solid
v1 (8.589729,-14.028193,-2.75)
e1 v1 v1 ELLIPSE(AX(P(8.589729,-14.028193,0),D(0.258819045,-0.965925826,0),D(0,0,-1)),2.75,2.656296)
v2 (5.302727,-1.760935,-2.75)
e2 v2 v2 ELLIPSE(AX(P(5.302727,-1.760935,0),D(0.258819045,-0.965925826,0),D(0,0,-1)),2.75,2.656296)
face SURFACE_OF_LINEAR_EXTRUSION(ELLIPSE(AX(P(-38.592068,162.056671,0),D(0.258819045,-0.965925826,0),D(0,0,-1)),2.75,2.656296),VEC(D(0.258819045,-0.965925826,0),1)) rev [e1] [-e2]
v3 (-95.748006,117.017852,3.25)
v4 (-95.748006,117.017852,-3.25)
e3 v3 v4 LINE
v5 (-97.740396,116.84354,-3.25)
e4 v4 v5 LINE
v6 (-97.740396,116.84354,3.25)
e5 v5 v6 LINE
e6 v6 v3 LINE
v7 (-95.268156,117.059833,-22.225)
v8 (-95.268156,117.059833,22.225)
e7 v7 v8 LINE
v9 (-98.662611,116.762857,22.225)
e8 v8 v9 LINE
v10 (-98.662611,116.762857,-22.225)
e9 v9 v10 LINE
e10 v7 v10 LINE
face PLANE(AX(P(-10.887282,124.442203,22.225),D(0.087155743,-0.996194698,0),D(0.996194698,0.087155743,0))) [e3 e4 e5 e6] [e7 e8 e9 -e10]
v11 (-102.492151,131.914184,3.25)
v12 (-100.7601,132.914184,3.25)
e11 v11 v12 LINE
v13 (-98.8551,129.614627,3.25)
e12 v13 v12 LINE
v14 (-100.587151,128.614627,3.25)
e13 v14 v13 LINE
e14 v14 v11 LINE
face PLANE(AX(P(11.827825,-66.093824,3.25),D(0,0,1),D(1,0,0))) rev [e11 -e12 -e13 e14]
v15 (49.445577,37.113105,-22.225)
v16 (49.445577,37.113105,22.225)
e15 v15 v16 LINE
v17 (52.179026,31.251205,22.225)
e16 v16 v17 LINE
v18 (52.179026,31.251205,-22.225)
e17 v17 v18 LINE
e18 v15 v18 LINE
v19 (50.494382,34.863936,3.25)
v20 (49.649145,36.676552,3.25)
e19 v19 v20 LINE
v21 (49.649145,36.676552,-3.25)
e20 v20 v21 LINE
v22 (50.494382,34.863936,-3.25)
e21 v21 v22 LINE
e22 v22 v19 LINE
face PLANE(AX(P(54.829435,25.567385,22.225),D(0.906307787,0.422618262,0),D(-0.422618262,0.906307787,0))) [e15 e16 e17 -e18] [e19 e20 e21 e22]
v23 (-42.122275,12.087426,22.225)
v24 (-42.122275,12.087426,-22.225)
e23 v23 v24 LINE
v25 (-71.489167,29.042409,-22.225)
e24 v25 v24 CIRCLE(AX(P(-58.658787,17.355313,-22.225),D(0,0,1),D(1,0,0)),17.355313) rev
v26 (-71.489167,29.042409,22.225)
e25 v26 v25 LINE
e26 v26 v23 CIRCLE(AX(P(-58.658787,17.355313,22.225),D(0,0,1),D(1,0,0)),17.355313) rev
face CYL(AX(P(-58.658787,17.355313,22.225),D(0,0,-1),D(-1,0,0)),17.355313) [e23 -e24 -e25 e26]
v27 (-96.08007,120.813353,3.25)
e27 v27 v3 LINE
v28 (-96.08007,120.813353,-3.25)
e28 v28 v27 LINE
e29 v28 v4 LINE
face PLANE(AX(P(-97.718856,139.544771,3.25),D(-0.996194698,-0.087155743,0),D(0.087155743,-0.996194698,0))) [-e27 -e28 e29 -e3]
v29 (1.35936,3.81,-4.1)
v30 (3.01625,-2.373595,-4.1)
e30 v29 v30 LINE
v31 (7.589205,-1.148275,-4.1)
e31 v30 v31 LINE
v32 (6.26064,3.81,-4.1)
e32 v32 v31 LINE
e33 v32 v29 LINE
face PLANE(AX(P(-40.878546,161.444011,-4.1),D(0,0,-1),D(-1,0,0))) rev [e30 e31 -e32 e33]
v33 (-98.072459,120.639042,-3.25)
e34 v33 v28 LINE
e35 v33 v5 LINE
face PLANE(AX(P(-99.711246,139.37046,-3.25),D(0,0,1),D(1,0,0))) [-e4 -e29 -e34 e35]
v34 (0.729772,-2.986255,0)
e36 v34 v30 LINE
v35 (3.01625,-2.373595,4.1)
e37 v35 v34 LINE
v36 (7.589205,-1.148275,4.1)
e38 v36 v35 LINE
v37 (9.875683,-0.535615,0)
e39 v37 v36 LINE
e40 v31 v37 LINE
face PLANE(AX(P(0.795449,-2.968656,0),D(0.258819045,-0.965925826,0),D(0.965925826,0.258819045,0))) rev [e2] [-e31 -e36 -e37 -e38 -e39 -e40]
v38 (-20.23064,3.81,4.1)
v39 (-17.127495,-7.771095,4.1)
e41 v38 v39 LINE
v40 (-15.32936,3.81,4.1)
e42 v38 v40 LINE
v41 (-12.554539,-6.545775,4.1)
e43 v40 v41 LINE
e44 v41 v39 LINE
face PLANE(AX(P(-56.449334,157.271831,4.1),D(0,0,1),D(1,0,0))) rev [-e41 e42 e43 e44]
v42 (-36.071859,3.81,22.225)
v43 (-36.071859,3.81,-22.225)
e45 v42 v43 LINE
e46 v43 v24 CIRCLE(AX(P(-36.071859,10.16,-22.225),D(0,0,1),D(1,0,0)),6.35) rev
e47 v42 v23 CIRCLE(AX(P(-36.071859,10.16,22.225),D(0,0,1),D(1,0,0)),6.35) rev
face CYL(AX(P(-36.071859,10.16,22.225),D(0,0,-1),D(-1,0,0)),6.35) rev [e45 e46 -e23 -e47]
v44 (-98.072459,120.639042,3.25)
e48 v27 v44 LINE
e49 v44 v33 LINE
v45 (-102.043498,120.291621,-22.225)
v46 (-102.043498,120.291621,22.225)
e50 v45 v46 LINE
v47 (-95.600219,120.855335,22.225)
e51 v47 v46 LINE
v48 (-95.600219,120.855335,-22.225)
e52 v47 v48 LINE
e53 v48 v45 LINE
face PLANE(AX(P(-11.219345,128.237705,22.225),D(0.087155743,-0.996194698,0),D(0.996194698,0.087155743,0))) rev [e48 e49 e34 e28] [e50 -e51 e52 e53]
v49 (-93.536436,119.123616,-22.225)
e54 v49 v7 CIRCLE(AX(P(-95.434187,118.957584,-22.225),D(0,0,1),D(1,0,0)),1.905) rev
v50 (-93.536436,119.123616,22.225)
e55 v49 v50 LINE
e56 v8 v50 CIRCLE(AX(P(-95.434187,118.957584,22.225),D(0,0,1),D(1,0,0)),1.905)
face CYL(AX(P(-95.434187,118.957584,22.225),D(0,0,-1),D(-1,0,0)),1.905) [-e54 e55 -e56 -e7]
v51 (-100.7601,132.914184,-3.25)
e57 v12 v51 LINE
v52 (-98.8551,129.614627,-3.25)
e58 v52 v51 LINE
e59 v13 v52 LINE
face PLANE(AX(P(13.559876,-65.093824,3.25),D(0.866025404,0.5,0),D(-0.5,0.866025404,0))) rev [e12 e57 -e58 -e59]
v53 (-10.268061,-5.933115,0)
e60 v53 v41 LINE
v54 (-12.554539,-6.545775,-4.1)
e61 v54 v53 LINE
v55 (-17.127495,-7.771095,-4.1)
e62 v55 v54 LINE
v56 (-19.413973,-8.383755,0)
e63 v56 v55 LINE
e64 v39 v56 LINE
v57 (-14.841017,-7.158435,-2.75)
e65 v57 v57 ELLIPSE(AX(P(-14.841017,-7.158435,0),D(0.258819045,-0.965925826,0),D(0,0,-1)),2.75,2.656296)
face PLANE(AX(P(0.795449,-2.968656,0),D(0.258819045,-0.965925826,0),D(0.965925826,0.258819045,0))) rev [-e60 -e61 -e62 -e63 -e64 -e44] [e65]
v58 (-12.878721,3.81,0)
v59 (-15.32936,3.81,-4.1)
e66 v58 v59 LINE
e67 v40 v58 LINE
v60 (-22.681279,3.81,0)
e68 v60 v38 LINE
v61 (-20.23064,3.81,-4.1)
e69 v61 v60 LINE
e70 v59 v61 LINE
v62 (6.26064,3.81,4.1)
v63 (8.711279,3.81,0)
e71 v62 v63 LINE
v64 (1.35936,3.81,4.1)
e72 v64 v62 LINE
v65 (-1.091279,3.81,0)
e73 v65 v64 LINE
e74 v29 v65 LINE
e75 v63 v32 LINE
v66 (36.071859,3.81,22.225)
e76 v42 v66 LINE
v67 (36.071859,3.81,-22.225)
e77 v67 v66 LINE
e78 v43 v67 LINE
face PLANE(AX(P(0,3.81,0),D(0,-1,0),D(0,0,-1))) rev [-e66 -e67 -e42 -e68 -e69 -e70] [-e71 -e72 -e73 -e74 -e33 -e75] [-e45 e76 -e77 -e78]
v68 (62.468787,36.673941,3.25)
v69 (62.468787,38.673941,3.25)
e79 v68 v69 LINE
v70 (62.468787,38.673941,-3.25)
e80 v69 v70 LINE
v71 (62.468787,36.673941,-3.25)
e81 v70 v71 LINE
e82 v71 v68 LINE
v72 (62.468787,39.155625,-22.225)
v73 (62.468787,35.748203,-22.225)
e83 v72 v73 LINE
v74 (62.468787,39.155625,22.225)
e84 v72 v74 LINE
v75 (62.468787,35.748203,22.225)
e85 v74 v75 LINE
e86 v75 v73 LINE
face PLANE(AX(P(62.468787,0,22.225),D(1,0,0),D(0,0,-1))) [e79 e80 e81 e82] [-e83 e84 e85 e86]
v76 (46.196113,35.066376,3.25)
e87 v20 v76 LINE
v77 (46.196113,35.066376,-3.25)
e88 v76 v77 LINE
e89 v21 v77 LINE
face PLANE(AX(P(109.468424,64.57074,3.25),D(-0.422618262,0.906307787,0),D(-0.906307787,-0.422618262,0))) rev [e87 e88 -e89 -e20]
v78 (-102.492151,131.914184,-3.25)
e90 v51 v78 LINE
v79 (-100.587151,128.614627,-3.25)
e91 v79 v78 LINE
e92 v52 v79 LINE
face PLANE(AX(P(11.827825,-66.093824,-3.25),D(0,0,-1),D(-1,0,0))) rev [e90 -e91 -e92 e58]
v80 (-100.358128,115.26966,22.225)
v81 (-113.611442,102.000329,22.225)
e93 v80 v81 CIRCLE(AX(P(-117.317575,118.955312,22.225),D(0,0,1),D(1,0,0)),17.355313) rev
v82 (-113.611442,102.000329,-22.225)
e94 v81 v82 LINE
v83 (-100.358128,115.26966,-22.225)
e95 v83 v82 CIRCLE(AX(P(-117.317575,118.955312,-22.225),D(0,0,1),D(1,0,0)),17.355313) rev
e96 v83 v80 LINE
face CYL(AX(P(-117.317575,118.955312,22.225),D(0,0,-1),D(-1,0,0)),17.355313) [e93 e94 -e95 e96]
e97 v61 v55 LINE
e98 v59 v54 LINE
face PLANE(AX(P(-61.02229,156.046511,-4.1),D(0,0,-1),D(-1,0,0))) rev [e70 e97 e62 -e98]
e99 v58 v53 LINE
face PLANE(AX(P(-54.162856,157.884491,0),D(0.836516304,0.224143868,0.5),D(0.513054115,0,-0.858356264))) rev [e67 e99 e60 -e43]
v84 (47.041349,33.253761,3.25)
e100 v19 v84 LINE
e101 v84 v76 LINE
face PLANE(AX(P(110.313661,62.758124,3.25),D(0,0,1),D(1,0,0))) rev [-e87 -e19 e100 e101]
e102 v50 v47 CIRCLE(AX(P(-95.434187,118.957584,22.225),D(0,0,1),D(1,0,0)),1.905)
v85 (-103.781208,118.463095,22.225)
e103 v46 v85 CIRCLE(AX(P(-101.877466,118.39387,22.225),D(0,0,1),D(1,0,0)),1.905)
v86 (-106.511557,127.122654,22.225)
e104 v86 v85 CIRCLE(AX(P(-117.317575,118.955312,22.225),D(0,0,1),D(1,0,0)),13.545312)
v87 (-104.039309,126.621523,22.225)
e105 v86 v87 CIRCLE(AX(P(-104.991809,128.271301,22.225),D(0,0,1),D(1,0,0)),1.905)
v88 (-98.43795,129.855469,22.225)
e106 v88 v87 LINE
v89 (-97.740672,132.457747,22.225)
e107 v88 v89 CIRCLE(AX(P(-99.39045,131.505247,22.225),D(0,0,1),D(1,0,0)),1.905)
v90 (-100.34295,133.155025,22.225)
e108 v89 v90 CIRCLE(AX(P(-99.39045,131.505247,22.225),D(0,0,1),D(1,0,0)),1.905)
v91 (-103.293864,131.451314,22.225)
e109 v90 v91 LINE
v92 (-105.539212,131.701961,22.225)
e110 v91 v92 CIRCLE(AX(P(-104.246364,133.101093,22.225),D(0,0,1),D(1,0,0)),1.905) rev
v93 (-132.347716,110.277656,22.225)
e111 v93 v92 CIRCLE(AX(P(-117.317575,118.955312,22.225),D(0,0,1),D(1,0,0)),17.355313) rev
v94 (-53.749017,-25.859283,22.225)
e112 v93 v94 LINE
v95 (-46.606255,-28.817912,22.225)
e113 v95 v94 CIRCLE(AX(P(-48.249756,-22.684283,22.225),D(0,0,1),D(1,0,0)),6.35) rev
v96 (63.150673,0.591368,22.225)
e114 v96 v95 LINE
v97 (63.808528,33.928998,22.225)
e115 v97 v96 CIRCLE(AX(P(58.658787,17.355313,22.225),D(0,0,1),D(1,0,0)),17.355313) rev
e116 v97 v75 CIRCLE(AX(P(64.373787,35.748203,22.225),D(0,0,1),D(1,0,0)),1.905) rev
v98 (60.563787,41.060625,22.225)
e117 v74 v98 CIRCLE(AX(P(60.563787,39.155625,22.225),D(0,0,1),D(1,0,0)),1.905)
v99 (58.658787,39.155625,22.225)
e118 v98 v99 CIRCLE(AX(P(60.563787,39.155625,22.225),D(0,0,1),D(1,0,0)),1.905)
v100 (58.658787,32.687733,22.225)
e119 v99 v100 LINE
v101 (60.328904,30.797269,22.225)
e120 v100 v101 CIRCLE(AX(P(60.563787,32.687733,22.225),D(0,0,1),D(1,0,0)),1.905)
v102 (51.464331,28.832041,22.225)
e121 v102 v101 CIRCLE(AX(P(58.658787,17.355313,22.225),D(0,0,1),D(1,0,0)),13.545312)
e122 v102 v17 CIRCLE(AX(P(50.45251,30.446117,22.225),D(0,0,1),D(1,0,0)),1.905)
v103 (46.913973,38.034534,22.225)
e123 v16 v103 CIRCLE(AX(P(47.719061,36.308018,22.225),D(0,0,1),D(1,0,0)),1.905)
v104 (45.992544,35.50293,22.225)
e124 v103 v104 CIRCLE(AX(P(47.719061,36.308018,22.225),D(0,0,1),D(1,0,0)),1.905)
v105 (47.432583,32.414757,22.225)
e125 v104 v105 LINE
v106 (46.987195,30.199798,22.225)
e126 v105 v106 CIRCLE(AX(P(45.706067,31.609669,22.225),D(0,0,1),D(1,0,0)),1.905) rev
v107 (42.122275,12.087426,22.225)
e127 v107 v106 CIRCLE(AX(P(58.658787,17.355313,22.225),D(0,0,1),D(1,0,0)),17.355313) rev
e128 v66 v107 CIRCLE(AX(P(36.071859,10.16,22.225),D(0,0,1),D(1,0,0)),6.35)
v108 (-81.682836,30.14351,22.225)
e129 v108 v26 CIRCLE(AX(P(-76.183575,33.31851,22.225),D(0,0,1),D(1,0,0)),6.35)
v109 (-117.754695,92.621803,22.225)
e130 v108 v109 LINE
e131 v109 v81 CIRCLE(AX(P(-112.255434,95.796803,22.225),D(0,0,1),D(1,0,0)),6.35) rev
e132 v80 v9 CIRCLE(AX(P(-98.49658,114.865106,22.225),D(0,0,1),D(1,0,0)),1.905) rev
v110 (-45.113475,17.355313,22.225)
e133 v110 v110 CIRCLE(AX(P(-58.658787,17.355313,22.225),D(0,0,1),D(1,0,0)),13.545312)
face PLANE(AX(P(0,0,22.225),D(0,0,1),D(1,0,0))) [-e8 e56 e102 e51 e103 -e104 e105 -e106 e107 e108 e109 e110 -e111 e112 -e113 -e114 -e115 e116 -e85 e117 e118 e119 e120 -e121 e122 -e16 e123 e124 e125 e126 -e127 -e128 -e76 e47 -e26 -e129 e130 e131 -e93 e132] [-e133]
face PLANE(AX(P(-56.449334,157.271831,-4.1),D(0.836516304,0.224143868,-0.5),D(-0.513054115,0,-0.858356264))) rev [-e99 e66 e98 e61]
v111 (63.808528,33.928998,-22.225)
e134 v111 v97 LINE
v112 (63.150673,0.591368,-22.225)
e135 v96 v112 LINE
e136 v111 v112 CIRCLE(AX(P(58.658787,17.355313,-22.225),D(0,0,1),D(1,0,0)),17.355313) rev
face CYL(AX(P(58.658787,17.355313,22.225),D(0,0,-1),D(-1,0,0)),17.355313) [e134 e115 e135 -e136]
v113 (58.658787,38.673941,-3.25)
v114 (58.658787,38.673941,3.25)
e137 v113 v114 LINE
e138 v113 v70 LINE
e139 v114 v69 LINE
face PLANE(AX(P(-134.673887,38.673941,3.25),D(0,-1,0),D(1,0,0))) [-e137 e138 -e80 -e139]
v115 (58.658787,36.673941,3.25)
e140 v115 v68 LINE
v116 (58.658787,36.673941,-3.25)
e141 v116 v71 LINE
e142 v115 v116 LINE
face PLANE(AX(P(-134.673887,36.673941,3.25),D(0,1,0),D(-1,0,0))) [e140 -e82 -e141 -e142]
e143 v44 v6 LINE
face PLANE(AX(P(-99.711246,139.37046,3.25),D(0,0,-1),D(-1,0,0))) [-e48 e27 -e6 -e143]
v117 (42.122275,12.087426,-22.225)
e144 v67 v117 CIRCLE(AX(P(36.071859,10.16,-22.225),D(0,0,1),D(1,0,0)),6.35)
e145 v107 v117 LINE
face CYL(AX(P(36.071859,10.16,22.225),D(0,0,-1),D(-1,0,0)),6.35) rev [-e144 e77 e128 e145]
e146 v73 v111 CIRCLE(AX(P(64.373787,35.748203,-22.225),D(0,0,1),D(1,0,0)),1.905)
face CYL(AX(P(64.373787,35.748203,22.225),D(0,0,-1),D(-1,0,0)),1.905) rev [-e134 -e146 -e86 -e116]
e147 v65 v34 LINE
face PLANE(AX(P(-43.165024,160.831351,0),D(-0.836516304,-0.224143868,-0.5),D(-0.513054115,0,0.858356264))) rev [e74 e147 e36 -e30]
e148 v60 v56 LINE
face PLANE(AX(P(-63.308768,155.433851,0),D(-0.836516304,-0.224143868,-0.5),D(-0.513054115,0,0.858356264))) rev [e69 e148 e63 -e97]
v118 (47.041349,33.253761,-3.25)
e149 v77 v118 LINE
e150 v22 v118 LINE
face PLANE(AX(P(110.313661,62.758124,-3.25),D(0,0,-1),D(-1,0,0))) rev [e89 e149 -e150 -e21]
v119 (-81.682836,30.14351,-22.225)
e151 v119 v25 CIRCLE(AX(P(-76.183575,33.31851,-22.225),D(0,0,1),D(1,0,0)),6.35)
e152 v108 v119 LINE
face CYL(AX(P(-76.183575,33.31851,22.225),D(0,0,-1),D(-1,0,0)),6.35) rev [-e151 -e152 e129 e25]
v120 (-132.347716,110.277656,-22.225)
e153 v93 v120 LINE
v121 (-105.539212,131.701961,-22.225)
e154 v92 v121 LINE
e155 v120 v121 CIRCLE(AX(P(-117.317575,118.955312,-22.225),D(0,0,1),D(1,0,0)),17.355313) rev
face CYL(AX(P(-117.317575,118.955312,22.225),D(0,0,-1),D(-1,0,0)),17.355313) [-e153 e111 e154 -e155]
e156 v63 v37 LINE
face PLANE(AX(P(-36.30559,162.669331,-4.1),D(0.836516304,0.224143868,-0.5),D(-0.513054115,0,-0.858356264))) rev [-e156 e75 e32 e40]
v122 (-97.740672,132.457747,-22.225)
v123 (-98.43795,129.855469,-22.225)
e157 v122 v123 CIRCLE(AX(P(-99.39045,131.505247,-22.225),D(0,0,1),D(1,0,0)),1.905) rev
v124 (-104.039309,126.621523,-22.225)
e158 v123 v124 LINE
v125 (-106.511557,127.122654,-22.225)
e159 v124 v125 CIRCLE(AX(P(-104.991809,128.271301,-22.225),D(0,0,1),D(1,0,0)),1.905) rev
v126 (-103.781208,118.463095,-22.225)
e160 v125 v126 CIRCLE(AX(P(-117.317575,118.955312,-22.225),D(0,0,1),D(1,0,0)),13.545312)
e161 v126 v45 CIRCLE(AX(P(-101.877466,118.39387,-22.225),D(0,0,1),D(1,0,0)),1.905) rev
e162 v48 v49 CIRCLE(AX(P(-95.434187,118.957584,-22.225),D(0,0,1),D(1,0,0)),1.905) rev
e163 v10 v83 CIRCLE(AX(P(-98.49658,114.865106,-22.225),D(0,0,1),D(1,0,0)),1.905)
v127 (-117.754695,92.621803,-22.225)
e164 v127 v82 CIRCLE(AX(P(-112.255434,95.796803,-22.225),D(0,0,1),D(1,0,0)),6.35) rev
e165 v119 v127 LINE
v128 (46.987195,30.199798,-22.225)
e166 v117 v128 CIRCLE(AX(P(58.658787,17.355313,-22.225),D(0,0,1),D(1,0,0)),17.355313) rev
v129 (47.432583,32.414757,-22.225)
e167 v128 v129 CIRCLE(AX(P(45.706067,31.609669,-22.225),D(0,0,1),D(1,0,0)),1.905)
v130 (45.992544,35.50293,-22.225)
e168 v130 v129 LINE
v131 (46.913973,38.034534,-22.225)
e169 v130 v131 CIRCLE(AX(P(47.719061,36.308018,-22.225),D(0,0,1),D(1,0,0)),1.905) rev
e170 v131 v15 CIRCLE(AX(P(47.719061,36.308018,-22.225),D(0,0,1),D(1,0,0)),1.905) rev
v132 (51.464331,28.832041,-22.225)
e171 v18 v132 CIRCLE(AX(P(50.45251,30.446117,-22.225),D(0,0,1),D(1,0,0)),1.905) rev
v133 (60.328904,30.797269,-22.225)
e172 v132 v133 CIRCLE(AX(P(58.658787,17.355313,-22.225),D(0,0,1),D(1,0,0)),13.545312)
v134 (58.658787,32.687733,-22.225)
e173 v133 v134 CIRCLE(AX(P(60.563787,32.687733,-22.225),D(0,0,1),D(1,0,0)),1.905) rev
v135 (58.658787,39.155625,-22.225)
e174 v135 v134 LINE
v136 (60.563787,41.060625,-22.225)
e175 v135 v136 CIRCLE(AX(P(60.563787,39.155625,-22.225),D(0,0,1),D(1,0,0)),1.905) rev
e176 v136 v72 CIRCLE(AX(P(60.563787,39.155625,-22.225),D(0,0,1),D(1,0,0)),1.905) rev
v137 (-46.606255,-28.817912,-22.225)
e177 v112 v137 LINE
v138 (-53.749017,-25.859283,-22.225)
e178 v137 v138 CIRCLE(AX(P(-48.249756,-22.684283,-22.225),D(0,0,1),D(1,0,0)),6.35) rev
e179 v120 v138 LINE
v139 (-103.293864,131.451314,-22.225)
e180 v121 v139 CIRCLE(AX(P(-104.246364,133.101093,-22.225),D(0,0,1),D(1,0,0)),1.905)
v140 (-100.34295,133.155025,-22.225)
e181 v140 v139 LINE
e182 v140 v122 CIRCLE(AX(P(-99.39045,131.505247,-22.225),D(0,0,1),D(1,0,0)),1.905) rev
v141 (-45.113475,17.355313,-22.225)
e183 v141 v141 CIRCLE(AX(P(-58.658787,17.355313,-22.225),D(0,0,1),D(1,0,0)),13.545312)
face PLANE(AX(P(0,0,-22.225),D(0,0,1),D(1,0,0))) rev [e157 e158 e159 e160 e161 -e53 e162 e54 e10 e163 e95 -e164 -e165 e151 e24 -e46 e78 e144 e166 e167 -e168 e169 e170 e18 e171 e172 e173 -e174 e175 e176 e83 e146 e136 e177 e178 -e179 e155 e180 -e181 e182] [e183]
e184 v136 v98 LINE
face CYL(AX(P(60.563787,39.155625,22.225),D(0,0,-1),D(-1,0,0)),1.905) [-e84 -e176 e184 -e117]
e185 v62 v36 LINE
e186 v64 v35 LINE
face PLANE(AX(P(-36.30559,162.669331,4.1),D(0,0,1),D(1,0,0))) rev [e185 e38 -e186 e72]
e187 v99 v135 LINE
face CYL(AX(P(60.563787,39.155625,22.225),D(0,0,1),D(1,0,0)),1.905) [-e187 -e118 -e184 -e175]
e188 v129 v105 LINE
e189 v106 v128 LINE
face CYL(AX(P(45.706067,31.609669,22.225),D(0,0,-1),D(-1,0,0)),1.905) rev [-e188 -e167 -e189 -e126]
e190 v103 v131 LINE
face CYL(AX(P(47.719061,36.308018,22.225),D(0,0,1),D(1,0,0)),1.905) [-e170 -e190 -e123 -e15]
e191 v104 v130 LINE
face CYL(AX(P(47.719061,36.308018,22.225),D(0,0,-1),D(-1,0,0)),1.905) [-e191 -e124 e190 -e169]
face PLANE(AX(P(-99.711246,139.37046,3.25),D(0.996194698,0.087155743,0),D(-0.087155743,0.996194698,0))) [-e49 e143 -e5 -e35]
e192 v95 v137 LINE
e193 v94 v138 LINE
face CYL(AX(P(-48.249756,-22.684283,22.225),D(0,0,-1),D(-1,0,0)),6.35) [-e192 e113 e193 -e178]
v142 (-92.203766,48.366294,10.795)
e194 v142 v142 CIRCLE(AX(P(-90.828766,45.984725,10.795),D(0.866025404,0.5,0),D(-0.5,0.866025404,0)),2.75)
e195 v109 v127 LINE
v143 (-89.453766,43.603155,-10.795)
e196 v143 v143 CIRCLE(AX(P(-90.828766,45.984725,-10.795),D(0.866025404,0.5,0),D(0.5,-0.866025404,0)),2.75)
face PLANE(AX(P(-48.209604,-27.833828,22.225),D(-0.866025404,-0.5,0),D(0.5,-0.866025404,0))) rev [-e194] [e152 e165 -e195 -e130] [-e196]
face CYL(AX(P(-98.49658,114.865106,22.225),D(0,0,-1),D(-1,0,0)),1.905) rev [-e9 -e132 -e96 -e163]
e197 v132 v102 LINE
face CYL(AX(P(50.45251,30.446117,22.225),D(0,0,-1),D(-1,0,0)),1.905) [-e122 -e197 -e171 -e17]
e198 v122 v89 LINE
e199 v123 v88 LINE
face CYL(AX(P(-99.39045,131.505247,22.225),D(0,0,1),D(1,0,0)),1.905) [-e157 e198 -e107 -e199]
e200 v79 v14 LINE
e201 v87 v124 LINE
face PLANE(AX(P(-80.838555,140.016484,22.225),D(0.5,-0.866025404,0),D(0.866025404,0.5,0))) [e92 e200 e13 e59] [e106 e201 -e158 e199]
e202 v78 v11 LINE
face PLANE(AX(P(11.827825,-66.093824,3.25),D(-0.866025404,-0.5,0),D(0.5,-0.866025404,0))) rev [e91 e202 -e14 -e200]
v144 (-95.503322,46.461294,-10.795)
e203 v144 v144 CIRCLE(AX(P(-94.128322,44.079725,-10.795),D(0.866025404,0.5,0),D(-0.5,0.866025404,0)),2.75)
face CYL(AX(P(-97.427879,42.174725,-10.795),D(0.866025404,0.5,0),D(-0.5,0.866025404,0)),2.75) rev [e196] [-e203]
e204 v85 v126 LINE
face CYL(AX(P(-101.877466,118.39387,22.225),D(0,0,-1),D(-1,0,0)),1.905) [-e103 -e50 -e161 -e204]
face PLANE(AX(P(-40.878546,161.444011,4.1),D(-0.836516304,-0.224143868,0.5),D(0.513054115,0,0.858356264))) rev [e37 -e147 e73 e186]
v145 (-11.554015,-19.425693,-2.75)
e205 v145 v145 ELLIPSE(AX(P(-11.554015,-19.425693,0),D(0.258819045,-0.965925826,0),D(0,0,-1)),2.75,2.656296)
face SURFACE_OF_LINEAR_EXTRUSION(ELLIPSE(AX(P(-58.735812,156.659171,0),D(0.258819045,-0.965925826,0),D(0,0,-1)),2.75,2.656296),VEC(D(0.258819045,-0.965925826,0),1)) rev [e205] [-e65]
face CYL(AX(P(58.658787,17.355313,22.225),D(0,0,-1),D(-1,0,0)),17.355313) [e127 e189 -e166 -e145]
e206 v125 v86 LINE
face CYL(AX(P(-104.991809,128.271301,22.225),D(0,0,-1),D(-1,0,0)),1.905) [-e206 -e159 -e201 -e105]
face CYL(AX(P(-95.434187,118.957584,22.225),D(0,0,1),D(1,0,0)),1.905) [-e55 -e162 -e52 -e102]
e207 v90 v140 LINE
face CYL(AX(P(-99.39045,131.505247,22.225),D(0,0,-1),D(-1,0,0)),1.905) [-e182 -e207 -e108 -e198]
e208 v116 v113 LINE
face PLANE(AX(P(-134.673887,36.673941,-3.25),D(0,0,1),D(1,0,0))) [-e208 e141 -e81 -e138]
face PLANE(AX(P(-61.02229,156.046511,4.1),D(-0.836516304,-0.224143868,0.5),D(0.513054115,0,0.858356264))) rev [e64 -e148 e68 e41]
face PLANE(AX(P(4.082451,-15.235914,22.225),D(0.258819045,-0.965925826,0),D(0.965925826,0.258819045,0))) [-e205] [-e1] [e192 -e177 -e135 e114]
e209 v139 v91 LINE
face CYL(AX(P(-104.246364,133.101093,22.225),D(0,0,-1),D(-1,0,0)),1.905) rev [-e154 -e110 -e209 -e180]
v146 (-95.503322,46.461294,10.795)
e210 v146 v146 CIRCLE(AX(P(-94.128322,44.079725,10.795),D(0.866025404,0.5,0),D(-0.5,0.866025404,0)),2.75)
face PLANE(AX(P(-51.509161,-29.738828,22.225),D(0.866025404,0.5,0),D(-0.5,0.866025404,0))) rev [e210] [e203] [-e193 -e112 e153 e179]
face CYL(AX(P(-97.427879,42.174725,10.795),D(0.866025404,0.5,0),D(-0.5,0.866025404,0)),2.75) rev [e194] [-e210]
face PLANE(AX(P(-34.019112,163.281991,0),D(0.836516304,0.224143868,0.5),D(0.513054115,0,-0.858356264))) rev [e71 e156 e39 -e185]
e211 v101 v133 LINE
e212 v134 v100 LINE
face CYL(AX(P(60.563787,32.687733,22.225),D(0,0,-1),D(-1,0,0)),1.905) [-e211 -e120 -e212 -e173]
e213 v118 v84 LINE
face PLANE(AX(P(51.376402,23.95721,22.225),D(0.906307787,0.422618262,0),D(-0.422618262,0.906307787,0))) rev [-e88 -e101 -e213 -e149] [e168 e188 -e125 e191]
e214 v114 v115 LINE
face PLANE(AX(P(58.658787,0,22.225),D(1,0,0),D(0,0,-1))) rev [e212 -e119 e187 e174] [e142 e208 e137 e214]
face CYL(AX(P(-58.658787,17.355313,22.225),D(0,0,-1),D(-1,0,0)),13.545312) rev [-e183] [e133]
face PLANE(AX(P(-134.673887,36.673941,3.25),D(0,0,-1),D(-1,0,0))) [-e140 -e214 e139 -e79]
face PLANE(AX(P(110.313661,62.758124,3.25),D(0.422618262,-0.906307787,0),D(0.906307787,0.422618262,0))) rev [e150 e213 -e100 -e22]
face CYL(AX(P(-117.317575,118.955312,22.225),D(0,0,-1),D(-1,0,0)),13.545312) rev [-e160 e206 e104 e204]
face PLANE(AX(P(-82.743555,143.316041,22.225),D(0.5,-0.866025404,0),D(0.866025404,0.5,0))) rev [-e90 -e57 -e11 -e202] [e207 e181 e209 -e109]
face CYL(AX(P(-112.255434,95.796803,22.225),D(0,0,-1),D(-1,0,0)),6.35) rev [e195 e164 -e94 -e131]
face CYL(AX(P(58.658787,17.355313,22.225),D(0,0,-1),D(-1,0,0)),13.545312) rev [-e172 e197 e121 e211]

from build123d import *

# Parameters (mm, degrees)
SKETCH3_W               = 114.3
SKETCH3_H               = 19.05
BOSS_EXTRUDE1_DEPTH     = 3.81
BOSS_EXTRUDE2_START     = -22.225
BOSS_EXTRUDE2_OUTLINE_R = 13.5453125
BOSS_EXTRUDE2_DEPTH     = 44.45
SKETCH6_R               = 2.749999961
CUT_EXTRUDE5_DEPTH      = 7.62
CUT_EXTRUDE7_REACH      = 208.672
SKETCH7_RX              = 2.749999961
SKETCH7_RY              = 2.656295985
CUT_EXTRUDE8_REACH      = 221.372
CUT_EXTRUDE8_START      = -12.7
CUT_EXTRUDE9_REACH      = 237.378
SKETCH14_W              = 2
SKETCH14_H              = 6.499999954
MIRROR2_COPY_1_REACH    = 237.378
MIRROR2_COPY_1_SKETCH_W = 2
MIRROR2_COPY_1_SKETCH_H = 6.499999954
FILLET1_R               = 1.905


# Read off the part's stored shape, not the designer's step: Boss-Extrude2
with BuildPart() as part:
    # Sketch3 → Boss-Extrude1 (new body)
    with BuildSketch(Plane(origin=(0, 0, 0), x_dir=(1, 0, 0), z_dir=(0, 1, 0))):
        Rectangle(SKETCH3_W, SKETCH3_H)
    extrude(amount=BOSS_EXTRUDE1_DEPTH)

    # Boss-Extrude2 outline → Boss-Extrude2 (add)
    with BuildSketch(Plane.XY.offset(BOSS_EXTRUDE2_START)):
        with BuildLine():
            ThreePointArc((48.050005342, 31.090690807), (42.090813056, 22.523397373), (42.122274879, 12.087425946))
            ThreePointArc((42.122274879, 12.087425946), (41.198342199, 6.412778013), (36.071859255, 3.81))
            Line((36.071859255, 3.81), (-36.071859255, 3.81))
            ThreePointArc((-36.071859255, 3.81), (-41.198342199, 6.412778013), (-42.122274879, 12.087425946))
            ThreePointArc((-42.122274879, 12.087425946), (-49.981131055, 32.385454016), (-71.489167098, 29.042409074))
            ThreePointArc((-71.489167098, 29.042409074), (-76.865522705, 27.00523428), (-81.682836057, 30.143509735))
            Line((-81.682836057, 30.143509735), (-117.754695312, 92.621802688))
            ThreePointArc((-117.754695312, 92.621802688), (-118.063864905, 98.362856156), (-113.611441977, 102.000329294))
            ThreePointArc((-113.611441977, 102.000329294), (-104.557894696, 107.19106827), (-100.117997084, 116.635526893))
            Line((-100.117997084, 116.635526893), (-93.370404601, 117.225864741))
            Line((-93.370404601, 117.225864741), (-93.702467981, 121.021366541))
            Line((-93.702467981, 121.021366541), (-103.823806114, 120.135864194))
            ThreePointArc((-103.823806114, 120.135864194), (-130.235968745, 114.8821584), (-105.586989883, 125.727968673))
            Line((-105.586989883, 125.727968673), (-96.78817178, 130.807968673))
            Line((-96.78817178, 130.807968673), (-98.69317178, 134.107525461))
            Line((-98.69317178, 134.107525461), (-104.559079836, 130.720841866))
            ThreePointArc((-104.559079836, 130.720841866), (-127.602080191, 132.935148506), (-132.347716126, 110.277656173))
            Line((-132.347716126, 110.277656173), (-53.749017487, -25.859283278))
            ThreePointArc((-53.749017487, -25.859283278), (-50.679795969, -28.55091831), (-46.606255237, -28.817912275))
            Line((-46.606255237, -28.817912275), (63.150672714, 0.591367933))
            ThreePointArc((63.150672714, 0.591367933), (76.010547273, 17.706450636), (62.468787305, 34.28725781))
            Line((62.468787305, 34.28725781), (62.468787305, 41.060625))
            Line((62.468787305, 41.060625), (58.658787305, 41.060625))
            Line((58.658787305, 41.060625), (58.658787305, 30.900625))
            ThreePointArc((58.658787305, 30.900625), (61.590529512, 4.131077991), (52.934290882, 29.631534697))
            Line((52.934290882, 29.631534697), (48.640489342, 38.839621813))
            Line((48.640489342, 38.839621813), (45.187456674, 37.229446236))
            Line((45.187456674, 37.229446236), (48.050005342, 31.090690807))
        make_face()
        with Locations((-58.658787305, 17.3553125)):
            Circle(BOSS_EXTRUDE2_OUTLINE_R, mode=Mode.SUBTRACT)
    extrude(amount=BOSS_EXTRUDE2_DEPTH)

    # Sketch6 → Cut-Extrude5 (cut)
    with BuildSketch(Plane(origin=(-48.209604448, -27.833828106, 0), x_dir=(0, 0, -1), z_dir=(0.8660254037844433, 0.4999999999999923, 0))):
        with Locations(Location((-10.795, 85.238322473, 0), (0, 0, 90))):
            Circle(SKETCH6_R)
        with Locations(Location((10.795, 85.238322473, 0), (0, 0, 90))):
            Circle(SKETCH6_R)
    extrude(amount=-CUT_EXTRUDE5_DEPTH, mode=Mode.SUBTRACT)

    # Cut-Extrude7: up to this plane
    cut_extrude7_end = Plane(origin=(0, 3.81, 0), z_dir=(0, -1, 0))
    # Sketch7 → Cut-Extrude7 (cut, up to the surface)
    with BuildSketch(Plane(origin=(4.082450956, -15.235914386, 0), x_dir=(0.9659258262890681, 0.25881904510252174, 0), z_dir=(0.25881904510252174, -0.9659258262890681, 0)), mode=Mode.PRIVATE) as cut_extrude7_sk1:
        with Locations(Location((4.66627796, 0), (0, 0, -90))):
            Ellipse(SKETCH7_RX, SKETCH7_RY)
    cut_extrude7_tool1 = split(extrude(cut_extrude7_sk1.sketch, amount=-CUT_EXTRUDE7_REACH, mode=Mode.PRIVATE), bisect_by=cut_extrude7_end, keep=Keep.BOTH, mode=Mode.PRIVATE)
    add(cut_extrude7_tool1.solids().sort_by_distance((8.589729, -14.028193, 0))[0], mode=Mode.SUBTRACT)
    # Sketch7 → Cut-Extrude7 (cut, up to the surface)
    with BuildSketch(Plane(origin=(4.082450956, -15.235914386, 0), x_dir=(0.9659258262890681, 0.25881904510252174, 0), z_dir=(0.25881904510252174, -0.9659258262890681, 0)), mode=Mode.PRIVATE) as cut_extrude7_sk2:
        with Locations(Location((-16.18806063, 0), (0, 0, -90))):
            Ellipse(SKETCH7_RX, SKETCH7_RY)
    cut_extrude7_tool2 = split(extrude(cut_extrude7_sk2.sketch, amount=-CUT_EXTRUDE7_REACH, mode=Mode.PRIVATE), bisect_by=cut_extrude7_end, keep=Keep.BOTH, mode=Mode.PRIVATE)
    add(cut_extrude7_tool2.solids().sort_by_distance((-11.554015, -19.425693, 0))[0], mode=Mode.SUBTRACT)

    # Cut-Extrude8: up to this plane
    cut_extrude8_end = Plane(origin=(0, 3.81, 0), z_dir=(0, -1, 0))
    # Sketch11 → Cut-Extrude8 (cut, up to the surface)
    with BuildSketch(Plane(origin=(4.082450956, -15.235914386, 0), x_dir=(0.9659258262890681, 0.25881904510252174, 0), z_dir=(0.25881904510252174, -0.9659258262890681, 0)).offset(CUT_EXTRUDE8_START), mode=Mode.PRIVATE) as cut_extrude8_sk1:
        Polygon((-11.453788359, 0), (-13.820924494, 4.100000055), (-18.555196765, 4.100000055), (-20.9223329, 0), (-18.555196765, -4.100000055), (-13.820924494, -4.100000055), align=None)
    cut_extrude8_tool1 = split(extrude(cut_extrude8_sk1.sketch, amount=-CUT_EXTRUDE8_REACH, mode=Mode.PRIVATE), bisect_by=cut_extrude8_end, keep=Keep.BOTH, mode=Mode.PRIVATE)
    add(cut_extrude8_tool1.solids().sort_by_distance((-14.841017, -7.158435, 0))[0], mode=Mode.SUBTRACT)
    # Sketch11 → Cut-Extrude8 (cut, up to the surface)
    with BuildSketch(Plane(origin=(4.082450956, -15.235914386, 0), x_dir=(0.9659258262890681, 0.25881904510252174, 0), z_dir=(0.25881904510252174, -0.9659258262890681, 0)).offset(CUT_EXTRUDE8_START), mode=Mode.PRIVATE) as cut_extrude8_sk2:
        Polygon((9.400550231, 0), (7.033414095, 4.100000055), (2.299141825, 4.100000055), (-0.067994311, 0), (2.299141825, -4.100000055), (7.033414095, -4.100000055), align=None)
    cut_extrude8_tool2 = split(extrude(cut_extrude8_sk2.sketch, amount=-CUT_EXTRUDE8_REACH, mode=Mode.PRIVATE), bisect_by=cut_extrude8_end, keep=Keep.BOTH, mode=Mode.PRIVATE)
    add(cut_extrude8_tool2.solids().sort_by_distance((5.302727, -1.760935, 0))[0], mode=Mode.SUBTRACT)

    # Sketch14 → Cut-Extrude9 (cut, up to next)
    with BuildSketch(Plane(origin=(-82.743554889, 143.316041067, 0), x_dir=(0.8660254037844421, 0.499999999999994, 0), z_dir=(-0.499999999999994, 0.8660254037844421, 0)), mode=Mode.PRIVATE) as cut_extrude9_sk1:
        with Locations((-21.803714806, 0)):
            Rectangle(SKETCH14_W, SKETCH14_H)
    cut_extrude9_tool1 = extrude(cut_extrude9_sk1.sketch, amount=-CUT_EXTRUDE9_REACH, mode=Mode.PRIVATE) & part.part
    cut_extrude9 = cut_extrude9_tool1.solids().sort_by_distance((-101.626126, 132.414184, 0))[0]
    add(cut_extrude9, mode=Mode.SUBTRACT)

    # Mirror1: Cut-Extrude9 across plane
    add(cut_extrude9.mirror(Plane(origin=(-44.723303861, 141.844198069, 0), x_dir=(0, 0, 1), z_dir=(0.30070579950426285, -0.9537169507482302, 0))), mode=Mode.SUBTRACT)

    # Mirror2: Cut-Extrude9 across plane
    add(cut_extrude9.mirror(Plane(origin=(-51.509161237, 29.738828106, 0), x_dir=(0, 0, 1), z_dir=(0.8660254037844365, -0.500000000000004, 0))), mode=Mode.SUBTRACT)

    # Mirror2 copy 1 sketch → Mirror2 copy 1 (cut, up to next)
    with BuildSketch(Plane(origin=(37.404082957, 53.920945037, 0), x_dir=(-0.42261826174070477, 0.9063077870366477, 0), z_dir=(-0.9063077870366478, -0.42261826174070427, 0)), mode=Mode.PRIVATE) as mirror2_copy_1_sk1:
        with Locations((-21.803714806, 0)):
            Rectangle(MIRROR2_COPY_1_SKETCH_W, MIRROR2_COPY_1_SKETCH_H)
    mirror2_copy_1_tool1 = extrude(mirror2_copy_1_sk1.sketch, amount=-MIRROR2_COPY_1_REACH, mode=Mode.PRIVATE) & part.part
    add(mirror2_copy_1_tool1.solids().sort_by_distance((46.618730656, 34.16006836, 0))[0], mode=Mode.SUBTRACT)

    # Fillet1
    fillet1_edges = [part.edges().sort_by_distance(p)[0] for p in [
        (-105.586989883, 125.727968673, 0),
        (-103.823806114, 120.135864194, 0),
        (-100.117997084, 116.635526893, 0),
        (-104.559079836, 130.720841866, 0),
        (52.934290882, 29.631534697, 0),
        (58.658787305, 30.900625, 0),
        (48.050005342, 31.090690807, 0),
        (62.468787305, 34.28725781, 0),
        (62.468787305, 41.060625, 0),
        (45.187456674, 37.229446236, 0),
        (48.640489342, 38.839621813, 0),
        (58.658787305, 41.060625, 0),
        (-93.370404601, 117.225864741, 0),
        (-93.702467981, 121.021366541, 0),
        (-96.78817178, 130.807968673, 0),
        (-98.69317178, 134.107525461, 0),
    ]]
    fillet(fillet1_edges, radius=FILLET1_R - 0.0001)  # a hair under: the kernel refuses the full size


solid = part.part
